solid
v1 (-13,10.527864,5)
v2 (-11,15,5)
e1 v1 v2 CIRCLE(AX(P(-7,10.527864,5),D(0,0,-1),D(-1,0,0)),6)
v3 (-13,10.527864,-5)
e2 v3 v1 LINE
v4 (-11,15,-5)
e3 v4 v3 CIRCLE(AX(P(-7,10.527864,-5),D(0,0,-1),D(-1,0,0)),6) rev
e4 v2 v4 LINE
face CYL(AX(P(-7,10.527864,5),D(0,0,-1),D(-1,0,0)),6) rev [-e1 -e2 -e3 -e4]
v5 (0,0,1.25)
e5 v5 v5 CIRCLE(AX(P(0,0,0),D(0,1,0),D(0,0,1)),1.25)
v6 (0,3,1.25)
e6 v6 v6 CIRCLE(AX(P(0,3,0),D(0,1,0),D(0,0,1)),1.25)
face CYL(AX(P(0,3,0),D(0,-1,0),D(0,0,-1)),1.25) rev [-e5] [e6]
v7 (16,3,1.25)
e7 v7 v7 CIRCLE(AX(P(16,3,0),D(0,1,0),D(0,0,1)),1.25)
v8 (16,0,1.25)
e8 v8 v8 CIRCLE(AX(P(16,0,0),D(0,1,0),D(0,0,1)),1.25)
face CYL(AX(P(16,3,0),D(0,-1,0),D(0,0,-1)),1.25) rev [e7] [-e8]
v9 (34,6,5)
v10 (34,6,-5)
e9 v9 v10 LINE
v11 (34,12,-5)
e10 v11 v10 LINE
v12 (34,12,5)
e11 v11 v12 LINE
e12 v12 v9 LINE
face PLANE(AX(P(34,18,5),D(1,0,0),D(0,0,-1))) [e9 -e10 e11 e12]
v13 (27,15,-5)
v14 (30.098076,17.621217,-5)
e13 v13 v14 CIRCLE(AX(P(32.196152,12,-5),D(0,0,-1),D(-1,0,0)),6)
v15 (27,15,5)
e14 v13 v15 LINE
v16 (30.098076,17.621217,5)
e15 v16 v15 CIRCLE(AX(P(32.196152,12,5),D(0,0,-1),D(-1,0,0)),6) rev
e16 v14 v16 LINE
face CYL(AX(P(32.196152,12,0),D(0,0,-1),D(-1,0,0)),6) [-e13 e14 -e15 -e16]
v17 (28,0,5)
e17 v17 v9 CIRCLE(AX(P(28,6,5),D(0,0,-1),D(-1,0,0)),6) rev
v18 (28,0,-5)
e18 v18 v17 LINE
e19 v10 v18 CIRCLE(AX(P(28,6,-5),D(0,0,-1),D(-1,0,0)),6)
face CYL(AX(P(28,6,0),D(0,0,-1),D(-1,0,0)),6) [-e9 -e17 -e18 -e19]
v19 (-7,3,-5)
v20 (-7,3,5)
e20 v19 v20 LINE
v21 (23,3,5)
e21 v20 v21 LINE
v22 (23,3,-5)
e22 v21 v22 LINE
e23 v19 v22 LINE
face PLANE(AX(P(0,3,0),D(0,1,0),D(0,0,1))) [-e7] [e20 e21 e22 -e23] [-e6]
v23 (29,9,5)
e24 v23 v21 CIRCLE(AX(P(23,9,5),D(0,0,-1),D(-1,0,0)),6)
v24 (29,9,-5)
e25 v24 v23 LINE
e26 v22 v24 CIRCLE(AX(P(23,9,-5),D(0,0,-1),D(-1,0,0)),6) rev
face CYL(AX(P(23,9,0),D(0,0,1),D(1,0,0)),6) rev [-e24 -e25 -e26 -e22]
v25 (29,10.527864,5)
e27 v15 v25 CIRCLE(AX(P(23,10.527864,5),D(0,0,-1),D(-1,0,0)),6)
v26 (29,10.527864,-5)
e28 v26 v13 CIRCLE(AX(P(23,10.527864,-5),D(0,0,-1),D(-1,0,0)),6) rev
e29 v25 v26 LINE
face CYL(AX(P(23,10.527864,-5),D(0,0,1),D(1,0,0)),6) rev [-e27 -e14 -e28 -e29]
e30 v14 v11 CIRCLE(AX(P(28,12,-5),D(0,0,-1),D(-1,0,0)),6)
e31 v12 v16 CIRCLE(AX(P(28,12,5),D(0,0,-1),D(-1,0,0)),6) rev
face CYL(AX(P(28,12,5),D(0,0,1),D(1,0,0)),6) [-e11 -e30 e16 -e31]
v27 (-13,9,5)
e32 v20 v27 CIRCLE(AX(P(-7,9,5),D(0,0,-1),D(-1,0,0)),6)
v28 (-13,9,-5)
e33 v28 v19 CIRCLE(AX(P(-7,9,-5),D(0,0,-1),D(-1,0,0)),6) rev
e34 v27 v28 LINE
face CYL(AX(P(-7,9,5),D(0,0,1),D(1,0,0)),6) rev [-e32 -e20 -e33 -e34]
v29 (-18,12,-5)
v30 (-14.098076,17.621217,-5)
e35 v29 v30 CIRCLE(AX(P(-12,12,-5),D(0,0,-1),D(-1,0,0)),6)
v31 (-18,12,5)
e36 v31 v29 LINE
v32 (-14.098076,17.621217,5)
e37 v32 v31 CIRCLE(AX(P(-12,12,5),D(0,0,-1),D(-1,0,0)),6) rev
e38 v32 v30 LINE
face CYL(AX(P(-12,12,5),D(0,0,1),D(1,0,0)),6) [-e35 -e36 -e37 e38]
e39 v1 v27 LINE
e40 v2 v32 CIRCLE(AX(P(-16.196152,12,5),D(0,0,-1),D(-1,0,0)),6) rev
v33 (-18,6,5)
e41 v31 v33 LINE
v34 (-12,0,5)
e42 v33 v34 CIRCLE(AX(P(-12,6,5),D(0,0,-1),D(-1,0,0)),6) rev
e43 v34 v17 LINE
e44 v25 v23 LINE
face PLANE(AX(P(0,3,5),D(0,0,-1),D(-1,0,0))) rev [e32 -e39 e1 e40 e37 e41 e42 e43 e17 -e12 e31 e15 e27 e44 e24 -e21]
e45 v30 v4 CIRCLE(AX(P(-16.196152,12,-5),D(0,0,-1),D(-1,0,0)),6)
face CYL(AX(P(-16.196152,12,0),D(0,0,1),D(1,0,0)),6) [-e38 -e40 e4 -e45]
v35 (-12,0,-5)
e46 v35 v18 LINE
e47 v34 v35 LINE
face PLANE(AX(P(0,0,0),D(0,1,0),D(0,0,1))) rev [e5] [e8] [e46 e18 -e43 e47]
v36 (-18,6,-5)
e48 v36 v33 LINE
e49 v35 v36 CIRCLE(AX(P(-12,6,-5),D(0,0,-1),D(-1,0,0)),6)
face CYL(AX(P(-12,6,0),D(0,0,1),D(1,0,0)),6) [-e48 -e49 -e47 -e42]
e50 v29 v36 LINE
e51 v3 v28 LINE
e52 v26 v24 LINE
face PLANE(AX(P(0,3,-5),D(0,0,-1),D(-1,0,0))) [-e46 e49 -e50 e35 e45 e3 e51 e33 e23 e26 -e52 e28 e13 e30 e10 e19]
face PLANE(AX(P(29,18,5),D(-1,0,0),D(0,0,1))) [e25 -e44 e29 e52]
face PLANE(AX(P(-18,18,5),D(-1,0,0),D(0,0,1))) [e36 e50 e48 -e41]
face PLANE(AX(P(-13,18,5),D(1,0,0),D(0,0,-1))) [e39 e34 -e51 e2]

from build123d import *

# Parameters (mm, degrees)
SKETCH1_W           = 42
SKETCH1_H           = 10
SKETCH1_R           = 1.25
BOSS_EXTRUDE1_DEPTH = 3
SKETCH2_W           = 5
SKETCH2_H           = 10
BOSS_EXTRUDE2_DEPTH = 18
SKETCH3_W           = 10
SKETCH3_H           = 3
BOSS_EXTRUDE3_DEPTH = 2
SKETCH4_W           = 10
SKETCH4_H           = 3
BOSS_EXTRUDE4_DEPTH = 2
FILLET1_R           = 6


with BuildPart() as part:
    # Sketch1 → Boss-Extrude1 (new body)
    with BuildSketch(Plane(origin=(0, 0, 0), x_dir=(1, 0, 0), z_dir=(0, 1, 0))):
        with Locations((8, 0)):
            Rectangle(SKETCH1_W, SKETCH1_H)
        with Locations(Location((0, 0, 0), (0, 0, 270))):
            Circle(SKETCH1_R, mode=Mode.SUBTRACT)
        with Locations(Location((16, 0, 0), (0, 0, 270))):
            Circle(SKETCH1_R, mode=Mode.SUBTRACT)
    extrude(amount=BOSS_EXTRUDE1_DEPTH)

    # Sketch2 → Boss-Extrude2 (add)
    with BuildSketch(Plane.XZ):
        with Locations((-15.5, 0)):
            Rectangle(SKETCH2_W, SKETCH2_H)
        with Locations((31.5, 0)):
            Rectangle(SKETCH2_W, SKETCH2_H)
    extrude(amount=-BOSS_EXTRUDE2_DEPTH)

    # Sketch3 → Boss-Extrude3 (add)
    with BuildSketch(Plane(origin=(-13, 0, 0), x_dir=(0, 0, -1), z_dir=(1, 0, 0))):
        with Locations((0, 16.5)):
            Rectangle(SKETCH3_W, SKETCH3_H)
    extrude(amount=BOSS_EXTRUDE3_DEPTH)

    # Sketch4 → Boss-Extrude4 (add)
    with BuildSketch(Plane.ZY.offset(-29)):
        with Locations((0, 16.5)):
            Rectangle(SKETCH4_W, SKETCH4_H)
    extrude(amount=BOSS_EXTRUDE4_DEPTH)

    # Fillet1
    # the kernel refuses this fillet: 6 mm, written as the material it adds along each edge
    with BuildSketch(Plane(origin=(29, 15, 5), x_dir=(-1, 0, 0), z_dir=(0, 0, -1))) as fillet1_piece_1:
        with BuildLine():
            CenterArc((6, -4.472135955), FILLET1_R, 131.810314896, 48.189685104)
            Line((0, -4.472135955), (-0.12, -4.472135955))
            Line((-0.12, -4.472135955), (-0.12, 0))
            Line((-0.12, 0), (0, 0.12))
            ThreePointArc((0, 0.12), (1, 0.12), (1.92, 0.089442719))
            Line((1.92, 0.089442719), (2, 0))
        make_face()
    extrude(amount=10)
    with BuildSketch(Plane(origin=(29, 3, 5), x_dir=(0, 1, 0), z_dir=(0, 0, -1))) as fillet1_piece_2:
        with BuildLine():
            CenterArc((FILLET1_R, -FILLET1_R), FILLET1_R, 90, 90)
            Line((0, -FILLET1_R), (-FILLET1_R * 0.02, -FILLET1_R))
            Line((-FILLET1_R * 0.02, -FILLET1_R), (-FILLET1_R * 0.02, FILLET1_R * 0.02))
            Line((-FILLET1_R * 0.02, FILLET1_R * 0.02), (FILLET1_R, FILLET1_R * 0.02))
            Line((FILLET1_R, FILLET1_R * 0.02), (FILLET1_R, 0))
        make_face()
    extrude(amount=10)
    with BuildSketch(Plane(origin=(-13, 15, -5), x_dir=(0, -1, 0), z_dir=(0, 0, 1))) as fillet1_piece_3:
        with BuildLine():
            CenterArc((4.472135955, 6), FILLET1_R, 221.810314896, 48.189685104)
            Line((0, 2), (-0.089442719, 1.92))
            ThreePointArc((-0.089442719, 1.92), (-0.12, 1), (-0.12, 0))
            Line((-0.12, 0), (0, -0.12))
            Line((0, -0.12), (4.472135955, -0.12))
            Line((4.472135955, -0.12), (4.472135955, 0))
        make_face()
    extrude(amount=10)
    with BuildSketch(Plane(origin=(-13, 3, -5), x_dir=(1, 0, 0), z_dir=(0, 0, 1))) as fillet1_piece_4:
        with BuildLine():
            CenterArc((FILLET1_R, FILLET1_R), FILLET1_R, 180, 90)
            Line((0, FILLET1_R), (-FILLET1_R * 0.02, FILLET1_R))
            Line((-FILLET1_R * 0.02, FILLET1_R), (-FILLET1_R * 0.02, -FILLET1_R * 0.02))
            Line((-FILLET1_R * 0.02, -FILLET1_R * 0.02), (FILLET1_R, -FILLET1_R * 0.02))
            Line((FILLET1_R, -FILLET1_R * 0.02), (FILLET1_R, 0))
        make_face()
    extrude(amount=10)
    # the kernel refuses this fillet: 6 mm, written as the material it takes off along each edge
    with BuildSketch(Plane(origin=(-18, 0, -20), x_dir=(1, 0, 0), z_dir=(0, 0, 1))) as fillet1_2_piece_1:
        with BuildLine():
            CenterArc((FILLET1_R, FILLET1_R), FILLET1_R, 180, 90)
            Line((0, FILLET1_R), (-FILLET1_R * 0.02, FILLET1_R))
            Line((-FILLET1_R * 0.02, FILLET1_R), (-FILLET1_R * 0.02, -FILLET1_R * 0.02))
            Line((-FILLET1_R * 0.02, -FILLET1_R * 0.02), (FILLET1_R, -FILLET1_R * 0.02))
            Line((FILLET1_R, -FILLET1_R * 0.02), (FILLET1_R, 0))
        make_face()
    extrude(amount=40, mode=Mode.SUBTRACT)
    with BuildSketch(Plane(origin=(-18, 18, -20), x_dir=(1, 0, 0), z_dir=(0, 0, 1)), Plane(origin=(34, 0, -20), x_dir=(-1, 0, 0), z_dir=(0, 0, 1)), Plane(origin=(34, 18, -20), x_dir=(0, -1, 0), z_dir=(0, 0, 1))) as fillet1_2_piece_2:
        with BuildLine():
            CenterArc((FILLET1_R, -FILLET1_R), FILLET1_R, 90, 90)
            Line((0, -FILLET1_R), (-FILLET1_R * 0.02, -FILLET1_R))
            Line((-FILLET1_R * 0.02, -FILLET1_R), (-FILLET1_R * 0.02, FILLET1_R * 0.02))
            Line((-FILLET1_R * 0.02, FILLET1_R * 0.02), (FILLET1_R, FILLET1_R * 0.02))
            Line((FILLET1_R, FILLET1_R * 0.02), (FILLET1_R, 0))
        make_face()
    extrude(amount=40, mode=Mode.SUBTRACT)
    with BuildSketch(Plane(origin=(27, 18, -17.990381057), x_dir=(1, 0, 0), z_dir=(0, 0, 1))) as fillet1_2_piece_3:
        with BuildLine():
            CenterArc((5.196152423, -6), FILLET1_R, 90, 60)
            Line((0, -3), (-0.103923048, -2.94))
            ThreePointArc((-0.103923048, -2.94), (-0.12, -1.5), (-0.12, 0))
            Line((-0.12, 0), (0, 0.12))
            Line((0, 0.12), (5.196152423, 0.12))
            Line((5.196152423, 0.12), (5.196152423, 0))
        make_face()
    extrude(amount=35.980762114, mode=Mode.SUBTRACT)
    with BuildSketch(Plane(origin=(-11, 18, 17.990381057), x_dir=(0, -1, 0), z_dir=(0, 0, -1))) as fillet1_2_piece_4:
        with BuildLine():
            CenterArc((6, 5.196152423), FILLET1_R, 180, 60)
            Line((0, 5.196152423), (-0.12, 5.196152423))
            Line((-0.12, 5.196152423), (-0.12, 0))
            Line((-0.12, 0), (0, -0.12))
            ThreePointArc((0, -0.12), (1.5, -0.12), (2.94, -0.103923048))
            Line((2.94, -0.103923048), (3, 0))
        make_face()
    extrude(amount=35.980762114, mode=Mode.SUBTRACT)


solid = part.part
